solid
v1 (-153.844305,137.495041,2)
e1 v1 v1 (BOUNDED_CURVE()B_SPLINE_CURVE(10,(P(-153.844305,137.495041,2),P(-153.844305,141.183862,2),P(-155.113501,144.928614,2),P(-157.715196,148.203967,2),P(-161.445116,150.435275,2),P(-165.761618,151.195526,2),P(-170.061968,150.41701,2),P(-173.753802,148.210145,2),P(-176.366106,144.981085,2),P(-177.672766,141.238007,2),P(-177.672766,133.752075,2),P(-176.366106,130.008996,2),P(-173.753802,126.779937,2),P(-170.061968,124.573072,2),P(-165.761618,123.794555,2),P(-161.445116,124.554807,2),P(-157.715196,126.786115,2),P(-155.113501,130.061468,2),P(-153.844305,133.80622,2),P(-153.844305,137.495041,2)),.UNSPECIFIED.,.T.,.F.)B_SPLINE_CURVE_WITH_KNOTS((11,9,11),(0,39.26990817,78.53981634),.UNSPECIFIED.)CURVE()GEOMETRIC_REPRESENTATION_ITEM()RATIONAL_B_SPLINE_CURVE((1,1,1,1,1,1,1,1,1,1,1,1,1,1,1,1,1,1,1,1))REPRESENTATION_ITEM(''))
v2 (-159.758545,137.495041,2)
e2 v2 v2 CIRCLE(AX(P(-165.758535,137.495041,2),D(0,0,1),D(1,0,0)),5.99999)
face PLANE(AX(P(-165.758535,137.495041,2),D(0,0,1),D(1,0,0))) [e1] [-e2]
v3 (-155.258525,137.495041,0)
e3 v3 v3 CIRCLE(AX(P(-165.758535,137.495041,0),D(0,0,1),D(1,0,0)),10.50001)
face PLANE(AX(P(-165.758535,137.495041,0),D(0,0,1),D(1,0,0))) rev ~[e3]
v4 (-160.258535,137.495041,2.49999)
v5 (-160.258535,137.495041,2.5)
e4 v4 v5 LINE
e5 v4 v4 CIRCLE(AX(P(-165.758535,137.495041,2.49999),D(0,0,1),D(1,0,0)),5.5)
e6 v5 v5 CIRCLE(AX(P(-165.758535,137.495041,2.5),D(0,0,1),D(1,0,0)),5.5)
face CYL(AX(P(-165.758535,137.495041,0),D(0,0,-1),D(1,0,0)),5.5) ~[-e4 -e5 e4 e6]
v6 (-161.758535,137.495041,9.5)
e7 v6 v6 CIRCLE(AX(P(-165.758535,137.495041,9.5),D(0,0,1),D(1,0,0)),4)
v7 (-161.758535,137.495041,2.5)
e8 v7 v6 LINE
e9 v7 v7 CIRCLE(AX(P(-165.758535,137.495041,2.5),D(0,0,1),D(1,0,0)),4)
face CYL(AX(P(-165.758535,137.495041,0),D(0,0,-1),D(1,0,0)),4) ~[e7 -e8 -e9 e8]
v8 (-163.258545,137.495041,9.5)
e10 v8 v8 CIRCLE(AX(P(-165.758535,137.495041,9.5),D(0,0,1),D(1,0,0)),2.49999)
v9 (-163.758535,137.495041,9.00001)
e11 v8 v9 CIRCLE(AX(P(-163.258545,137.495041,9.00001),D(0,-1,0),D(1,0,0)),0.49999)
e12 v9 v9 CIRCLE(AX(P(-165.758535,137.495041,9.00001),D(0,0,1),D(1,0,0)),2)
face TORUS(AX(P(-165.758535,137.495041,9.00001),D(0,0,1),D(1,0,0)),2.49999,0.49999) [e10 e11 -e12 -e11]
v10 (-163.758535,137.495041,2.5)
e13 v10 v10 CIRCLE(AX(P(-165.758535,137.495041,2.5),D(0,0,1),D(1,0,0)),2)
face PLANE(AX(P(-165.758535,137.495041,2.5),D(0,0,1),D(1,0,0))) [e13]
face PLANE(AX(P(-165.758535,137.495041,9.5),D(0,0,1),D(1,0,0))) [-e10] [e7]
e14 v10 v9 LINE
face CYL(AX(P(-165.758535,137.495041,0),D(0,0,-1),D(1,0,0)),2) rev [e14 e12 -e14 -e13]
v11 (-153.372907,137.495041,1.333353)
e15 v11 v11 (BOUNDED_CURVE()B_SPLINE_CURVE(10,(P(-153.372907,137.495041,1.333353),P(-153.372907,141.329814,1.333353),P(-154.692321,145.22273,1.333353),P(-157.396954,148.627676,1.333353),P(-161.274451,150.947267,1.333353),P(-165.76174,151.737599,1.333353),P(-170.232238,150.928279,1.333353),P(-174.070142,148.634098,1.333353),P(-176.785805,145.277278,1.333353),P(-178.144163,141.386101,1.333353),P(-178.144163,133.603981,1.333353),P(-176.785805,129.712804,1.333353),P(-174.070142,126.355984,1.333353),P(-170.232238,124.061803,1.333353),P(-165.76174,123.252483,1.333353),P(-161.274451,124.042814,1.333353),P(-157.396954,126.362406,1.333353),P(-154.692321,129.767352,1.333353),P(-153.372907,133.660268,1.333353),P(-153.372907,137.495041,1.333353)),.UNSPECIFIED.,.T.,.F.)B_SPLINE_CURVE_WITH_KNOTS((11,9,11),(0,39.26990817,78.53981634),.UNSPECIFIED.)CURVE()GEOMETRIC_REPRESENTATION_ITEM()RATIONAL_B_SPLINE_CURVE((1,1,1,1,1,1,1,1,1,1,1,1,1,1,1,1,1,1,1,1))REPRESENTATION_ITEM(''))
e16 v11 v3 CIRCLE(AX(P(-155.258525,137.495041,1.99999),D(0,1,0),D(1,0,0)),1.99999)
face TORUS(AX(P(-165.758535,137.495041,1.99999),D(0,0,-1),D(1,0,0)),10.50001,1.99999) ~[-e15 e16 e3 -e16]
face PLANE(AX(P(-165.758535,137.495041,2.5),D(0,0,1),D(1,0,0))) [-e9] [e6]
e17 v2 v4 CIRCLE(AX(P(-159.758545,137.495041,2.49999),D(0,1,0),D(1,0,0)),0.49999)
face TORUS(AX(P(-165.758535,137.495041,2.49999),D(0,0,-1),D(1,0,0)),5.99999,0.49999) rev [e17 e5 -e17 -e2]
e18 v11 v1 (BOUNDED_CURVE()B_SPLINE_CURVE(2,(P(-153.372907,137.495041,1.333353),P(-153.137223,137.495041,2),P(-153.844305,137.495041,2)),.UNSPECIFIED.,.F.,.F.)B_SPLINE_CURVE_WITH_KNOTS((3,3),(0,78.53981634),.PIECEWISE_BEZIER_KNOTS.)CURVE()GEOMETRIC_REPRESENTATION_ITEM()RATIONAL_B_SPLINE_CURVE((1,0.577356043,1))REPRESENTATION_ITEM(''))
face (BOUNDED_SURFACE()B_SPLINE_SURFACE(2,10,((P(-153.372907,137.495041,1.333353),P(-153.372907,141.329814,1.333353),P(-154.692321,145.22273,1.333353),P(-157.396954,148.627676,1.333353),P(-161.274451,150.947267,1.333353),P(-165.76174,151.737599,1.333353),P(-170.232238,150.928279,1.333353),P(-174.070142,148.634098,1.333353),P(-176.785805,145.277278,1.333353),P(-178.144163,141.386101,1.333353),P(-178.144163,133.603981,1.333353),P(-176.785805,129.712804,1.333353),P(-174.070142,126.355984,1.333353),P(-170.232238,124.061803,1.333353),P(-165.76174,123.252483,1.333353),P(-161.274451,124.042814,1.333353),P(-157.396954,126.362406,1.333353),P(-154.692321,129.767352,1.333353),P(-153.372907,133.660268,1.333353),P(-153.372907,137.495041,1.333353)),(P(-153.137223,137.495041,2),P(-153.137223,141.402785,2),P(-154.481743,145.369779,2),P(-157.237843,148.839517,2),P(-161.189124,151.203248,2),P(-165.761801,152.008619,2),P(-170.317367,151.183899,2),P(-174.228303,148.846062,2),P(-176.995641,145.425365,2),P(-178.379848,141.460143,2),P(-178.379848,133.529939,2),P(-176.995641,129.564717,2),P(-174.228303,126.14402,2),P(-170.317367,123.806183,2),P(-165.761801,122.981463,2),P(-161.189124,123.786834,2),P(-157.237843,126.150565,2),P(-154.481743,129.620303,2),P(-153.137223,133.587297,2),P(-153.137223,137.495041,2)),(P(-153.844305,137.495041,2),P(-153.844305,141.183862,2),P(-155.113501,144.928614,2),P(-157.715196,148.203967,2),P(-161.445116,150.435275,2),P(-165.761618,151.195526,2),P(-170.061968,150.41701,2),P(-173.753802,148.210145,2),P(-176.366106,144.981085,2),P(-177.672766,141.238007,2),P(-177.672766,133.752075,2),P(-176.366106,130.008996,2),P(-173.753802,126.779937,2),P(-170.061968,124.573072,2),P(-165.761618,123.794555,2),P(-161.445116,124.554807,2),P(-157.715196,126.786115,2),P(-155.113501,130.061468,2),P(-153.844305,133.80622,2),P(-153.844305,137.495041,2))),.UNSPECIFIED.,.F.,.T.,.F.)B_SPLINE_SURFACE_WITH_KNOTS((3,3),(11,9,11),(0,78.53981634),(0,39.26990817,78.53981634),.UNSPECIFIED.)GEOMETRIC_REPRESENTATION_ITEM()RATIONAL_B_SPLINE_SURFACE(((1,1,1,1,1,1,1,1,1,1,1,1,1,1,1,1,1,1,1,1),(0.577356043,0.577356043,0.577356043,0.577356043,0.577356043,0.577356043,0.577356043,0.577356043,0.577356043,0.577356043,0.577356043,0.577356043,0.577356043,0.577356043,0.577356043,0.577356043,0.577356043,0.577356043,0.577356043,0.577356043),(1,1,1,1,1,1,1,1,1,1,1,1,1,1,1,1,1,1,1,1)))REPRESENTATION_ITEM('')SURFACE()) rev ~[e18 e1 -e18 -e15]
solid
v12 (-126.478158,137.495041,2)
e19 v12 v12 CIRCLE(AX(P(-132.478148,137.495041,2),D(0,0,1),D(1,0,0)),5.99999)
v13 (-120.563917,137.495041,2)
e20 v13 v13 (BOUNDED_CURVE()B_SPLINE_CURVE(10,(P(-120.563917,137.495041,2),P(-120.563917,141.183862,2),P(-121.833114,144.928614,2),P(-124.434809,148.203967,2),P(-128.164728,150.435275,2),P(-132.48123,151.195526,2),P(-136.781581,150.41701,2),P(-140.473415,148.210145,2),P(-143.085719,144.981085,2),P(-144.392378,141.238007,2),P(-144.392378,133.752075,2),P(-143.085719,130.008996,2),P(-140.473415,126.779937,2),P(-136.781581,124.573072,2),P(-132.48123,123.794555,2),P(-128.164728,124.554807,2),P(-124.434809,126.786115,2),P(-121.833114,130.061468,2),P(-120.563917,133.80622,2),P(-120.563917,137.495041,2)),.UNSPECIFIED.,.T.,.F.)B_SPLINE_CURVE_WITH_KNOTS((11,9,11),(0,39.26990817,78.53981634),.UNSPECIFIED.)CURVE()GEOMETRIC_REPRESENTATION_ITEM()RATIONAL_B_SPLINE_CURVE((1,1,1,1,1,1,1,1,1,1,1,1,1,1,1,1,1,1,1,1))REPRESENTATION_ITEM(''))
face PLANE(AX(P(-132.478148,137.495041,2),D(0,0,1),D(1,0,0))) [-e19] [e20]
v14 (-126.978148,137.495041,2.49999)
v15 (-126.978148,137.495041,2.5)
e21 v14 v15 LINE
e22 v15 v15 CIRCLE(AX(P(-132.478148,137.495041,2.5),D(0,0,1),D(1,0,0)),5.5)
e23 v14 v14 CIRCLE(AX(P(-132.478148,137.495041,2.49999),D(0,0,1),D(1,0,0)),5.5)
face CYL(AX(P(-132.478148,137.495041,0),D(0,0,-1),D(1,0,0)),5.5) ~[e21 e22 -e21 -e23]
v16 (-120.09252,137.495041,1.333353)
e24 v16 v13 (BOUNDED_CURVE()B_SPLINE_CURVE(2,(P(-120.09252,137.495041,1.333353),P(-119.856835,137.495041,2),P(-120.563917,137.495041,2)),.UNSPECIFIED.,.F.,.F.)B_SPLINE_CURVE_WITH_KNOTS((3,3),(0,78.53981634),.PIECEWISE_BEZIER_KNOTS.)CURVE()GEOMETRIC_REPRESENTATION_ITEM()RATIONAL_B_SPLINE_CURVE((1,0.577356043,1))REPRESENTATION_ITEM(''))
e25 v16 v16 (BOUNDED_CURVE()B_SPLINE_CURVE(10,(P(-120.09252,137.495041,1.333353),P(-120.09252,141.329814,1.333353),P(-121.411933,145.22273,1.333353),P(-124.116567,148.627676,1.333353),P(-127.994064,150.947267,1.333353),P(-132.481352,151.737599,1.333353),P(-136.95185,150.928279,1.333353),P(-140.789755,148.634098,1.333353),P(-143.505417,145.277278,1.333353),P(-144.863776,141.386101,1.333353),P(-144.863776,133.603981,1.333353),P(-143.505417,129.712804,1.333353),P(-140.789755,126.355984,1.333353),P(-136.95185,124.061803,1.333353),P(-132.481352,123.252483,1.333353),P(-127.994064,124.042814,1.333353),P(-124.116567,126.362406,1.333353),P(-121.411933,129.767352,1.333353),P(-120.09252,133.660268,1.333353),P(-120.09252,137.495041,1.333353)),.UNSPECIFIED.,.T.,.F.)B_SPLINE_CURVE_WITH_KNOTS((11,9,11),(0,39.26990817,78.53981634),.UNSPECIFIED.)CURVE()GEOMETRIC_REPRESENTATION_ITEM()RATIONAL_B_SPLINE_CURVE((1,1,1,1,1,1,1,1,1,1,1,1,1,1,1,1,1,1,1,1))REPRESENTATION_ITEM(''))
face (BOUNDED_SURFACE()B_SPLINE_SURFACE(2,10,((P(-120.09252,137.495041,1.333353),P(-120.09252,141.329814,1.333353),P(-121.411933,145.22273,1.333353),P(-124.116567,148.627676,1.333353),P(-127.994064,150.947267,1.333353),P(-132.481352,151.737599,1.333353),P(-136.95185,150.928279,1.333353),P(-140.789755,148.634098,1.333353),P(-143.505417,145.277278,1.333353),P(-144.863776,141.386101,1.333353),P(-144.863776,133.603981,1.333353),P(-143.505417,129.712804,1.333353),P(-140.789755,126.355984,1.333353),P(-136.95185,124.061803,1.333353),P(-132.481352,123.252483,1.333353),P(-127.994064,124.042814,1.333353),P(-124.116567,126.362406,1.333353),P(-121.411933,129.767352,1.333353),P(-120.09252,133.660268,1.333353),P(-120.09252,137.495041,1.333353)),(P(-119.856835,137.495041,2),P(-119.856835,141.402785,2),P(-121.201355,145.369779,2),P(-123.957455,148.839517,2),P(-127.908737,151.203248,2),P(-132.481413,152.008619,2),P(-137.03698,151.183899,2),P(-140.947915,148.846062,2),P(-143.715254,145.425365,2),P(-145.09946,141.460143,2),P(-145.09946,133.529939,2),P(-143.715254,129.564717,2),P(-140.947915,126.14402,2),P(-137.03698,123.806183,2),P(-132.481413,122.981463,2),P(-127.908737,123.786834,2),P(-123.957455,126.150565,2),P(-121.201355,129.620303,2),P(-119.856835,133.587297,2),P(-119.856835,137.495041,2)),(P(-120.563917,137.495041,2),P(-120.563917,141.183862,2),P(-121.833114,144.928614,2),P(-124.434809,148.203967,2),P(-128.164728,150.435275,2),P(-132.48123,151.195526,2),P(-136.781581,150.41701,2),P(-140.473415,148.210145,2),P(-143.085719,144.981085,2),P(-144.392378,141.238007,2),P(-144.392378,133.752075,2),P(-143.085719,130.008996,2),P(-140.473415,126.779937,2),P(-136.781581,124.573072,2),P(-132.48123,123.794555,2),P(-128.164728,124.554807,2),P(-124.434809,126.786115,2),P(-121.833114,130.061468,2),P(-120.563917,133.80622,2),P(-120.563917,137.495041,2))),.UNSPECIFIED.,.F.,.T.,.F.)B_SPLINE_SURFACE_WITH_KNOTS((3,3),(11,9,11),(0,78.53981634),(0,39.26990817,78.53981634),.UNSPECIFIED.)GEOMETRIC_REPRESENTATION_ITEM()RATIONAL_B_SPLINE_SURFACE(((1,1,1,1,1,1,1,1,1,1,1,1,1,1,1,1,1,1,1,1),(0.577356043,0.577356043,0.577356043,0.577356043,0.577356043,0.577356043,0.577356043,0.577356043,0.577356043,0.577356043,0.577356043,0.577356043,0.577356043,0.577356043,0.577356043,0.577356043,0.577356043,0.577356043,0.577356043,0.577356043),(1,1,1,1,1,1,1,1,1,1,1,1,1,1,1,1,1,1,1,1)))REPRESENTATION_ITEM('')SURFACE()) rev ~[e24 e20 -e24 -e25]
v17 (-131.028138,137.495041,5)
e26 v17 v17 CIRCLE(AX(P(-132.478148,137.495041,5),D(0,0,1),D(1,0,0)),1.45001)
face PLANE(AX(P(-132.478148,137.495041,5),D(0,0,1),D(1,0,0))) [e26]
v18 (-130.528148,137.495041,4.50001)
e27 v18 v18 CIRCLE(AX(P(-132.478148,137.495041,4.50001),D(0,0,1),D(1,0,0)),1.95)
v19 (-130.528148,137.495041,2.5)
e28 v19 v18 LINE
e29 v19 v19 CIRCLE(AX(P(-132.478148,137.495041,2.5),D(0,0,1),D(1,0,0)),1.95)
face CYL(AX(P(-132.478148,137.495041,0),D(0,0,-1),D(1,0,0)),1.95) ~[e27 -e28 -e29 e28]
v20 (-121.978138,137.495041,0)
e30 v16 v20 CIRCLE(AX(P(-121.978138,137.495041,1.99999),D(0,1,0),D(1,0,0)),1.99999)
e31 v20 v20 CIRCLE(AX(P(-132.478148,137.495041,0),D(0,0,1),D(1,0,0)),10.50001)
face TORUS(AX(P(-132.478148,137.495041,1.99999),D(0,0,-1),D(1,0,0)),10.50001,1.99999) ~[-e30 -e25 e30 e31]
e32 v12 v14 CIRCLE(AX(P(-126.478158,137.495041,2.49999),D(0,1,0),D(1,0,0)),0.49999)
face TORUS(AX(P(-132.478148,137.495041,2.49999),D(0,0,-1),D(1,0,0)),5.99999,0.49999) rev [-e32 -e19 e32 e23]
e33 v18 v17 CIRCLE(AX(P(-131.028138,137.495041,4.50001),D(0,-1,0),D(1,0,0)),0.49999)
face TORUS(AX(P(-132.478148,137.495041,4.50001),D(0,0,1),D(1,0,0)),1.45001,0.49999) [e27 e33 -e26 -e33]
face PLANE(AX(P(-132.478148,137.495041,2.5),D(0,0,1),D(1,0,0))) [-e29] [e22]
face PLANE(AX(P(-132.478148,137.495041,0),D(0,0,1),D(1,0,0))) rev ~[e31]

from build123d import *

# Parameters (mm, degrees)
F0_R     = 12.5
F0_R_2   = 5.5
F1_DEPTH = 2
F0_R_3   = 4
F2_DEPTH = 2.5
F0_R_4   = 1.95
F0_R_5   = 2
F3_DEPTH = 9.5
F4_DEPTH = 5
F7_R     = 1.99999
F8_R     = 0.49999


# Not quite as in the source:
# - a fillet or chamfer is up to 0.001 mm smaller than in the source, because OpenCascade refuses the exact size


with BuildPart() as f1:
    # F0 (on Top) → F1 (new body)
    with BuildSketch(Plane.XY):
        with Locations((-165.7585352659, 137.4950408936)):
            Circle(F0_R)
        with Locations((-165.7585352659, 137.4950408936)):
            Circle(F0_R_2, mode=Mode.SUBTRACT)
    extrude(amount=F1_DEPTH)


with BuildPart() as f1b:
    # F0 (on Top) → F1, piece 2 (new body)
    with BuildSketch(Plane.XY):
        with Locations((-132.4781477451, 137.4950408936)):
            Circle(F0_R)
        with Locations((-132.4781477451, 137.4950408936)):
            Circle(F0_R_2, mode=Mode.SUBTRACT)
    extrude(amount=F1_DEPTH)


with BuildPart() as f2:
    # F0 (on Top) → F2 (new body)
    with BuildSketch(Plane.XY):
        with Locations((-165.7585352659, 137.4950408936)):
            Circle(F0_R_2)
        with Locations((-165.7585352659, 137.4950408936)):
            Circle(F0_R_3, mode=Mode.SUBTRACT)
    extrude(amount=F2_DEPTH)


with BuildPart() as f2b:
    # F0 (on Top) → F2, piece 2 (new body)
    with BuildSketch(Plane.XY):
        with Locations((-132.4781477451, 137.4950408936)):
            Circle(F0_R_2)
        with Locations((-132.4781477451, 137.4950408936)):
            Circle(F0_R_4, mode=Mode.SUBTRACT)
    extrude(amount=F2_DEPTH)

    # F0 (on Top) → F4 (join)
    with BuildSketch(Plane.XY):
        with Locations((-132.4781477451, 137.4950408936)):
            Circle(F0_R_4)
    extrude(amount=F4_DEPTH)


with BuildPart() as f2c:
    # F0 (on Top) → F2, piece 3 (new body)
    with BuildSketch(Plane.XY):
        with Locations((-165.7585352659, 137.4950408936)):
            Circle(F0_R_5)
    extrude(amount=F2_DEPTH)


with BuildPart() as f3:
    # F0 (on Top) → F3 (new body)
    with BuildSketch(Plane.XY):
        with Locations((-165.7585352659, 137.4950408936)):
            Circle(F0_R_3)
        with Locations((-165.7585352659, 137.4950408936)):
            Circle(F0_R_5, mode=Mode.SUBTRACT)
    extrude(amount=F3_DEPTH)

    # F5: union F2c, F1, F2
    add(f2c.part)
    add(f1.part)
    add(f2.part)

    # F6: union F2b, F1b
    add(f2b.part)
    add(f1b.part)

    # F7 (radius 2 in the source; OpenCascade refuses exactly that, so slightly less here)
    f7_edges = [f3.edges().sort_by_distance(p)[0] for p in [
        (-144.978148, 137.495041, 0),
        (-178.258535, 137.495041, 0),
    ]]
    fillet(f7_edges, radius=F7_R)

    # F8 (radius 0.5 in the source; OpenCascade refuses exactly that, so slightly less here)
    f8_edges = [f3.edges().sort_by_distance(p)[0] for p in [
        (-178.258535, 137.495041, 2),
        (-171.258535, 137.495041, 2),
        (-144.978148, 137.495041, 2),
        (-137.978148, 137.495041, 2),
        (-134.428148, 137.495041, 5),
        (-167.758535, 137.495041, 9.5),
    ]]
    fillet(f8_edges, radius=F8_R)


solid = f3.part
